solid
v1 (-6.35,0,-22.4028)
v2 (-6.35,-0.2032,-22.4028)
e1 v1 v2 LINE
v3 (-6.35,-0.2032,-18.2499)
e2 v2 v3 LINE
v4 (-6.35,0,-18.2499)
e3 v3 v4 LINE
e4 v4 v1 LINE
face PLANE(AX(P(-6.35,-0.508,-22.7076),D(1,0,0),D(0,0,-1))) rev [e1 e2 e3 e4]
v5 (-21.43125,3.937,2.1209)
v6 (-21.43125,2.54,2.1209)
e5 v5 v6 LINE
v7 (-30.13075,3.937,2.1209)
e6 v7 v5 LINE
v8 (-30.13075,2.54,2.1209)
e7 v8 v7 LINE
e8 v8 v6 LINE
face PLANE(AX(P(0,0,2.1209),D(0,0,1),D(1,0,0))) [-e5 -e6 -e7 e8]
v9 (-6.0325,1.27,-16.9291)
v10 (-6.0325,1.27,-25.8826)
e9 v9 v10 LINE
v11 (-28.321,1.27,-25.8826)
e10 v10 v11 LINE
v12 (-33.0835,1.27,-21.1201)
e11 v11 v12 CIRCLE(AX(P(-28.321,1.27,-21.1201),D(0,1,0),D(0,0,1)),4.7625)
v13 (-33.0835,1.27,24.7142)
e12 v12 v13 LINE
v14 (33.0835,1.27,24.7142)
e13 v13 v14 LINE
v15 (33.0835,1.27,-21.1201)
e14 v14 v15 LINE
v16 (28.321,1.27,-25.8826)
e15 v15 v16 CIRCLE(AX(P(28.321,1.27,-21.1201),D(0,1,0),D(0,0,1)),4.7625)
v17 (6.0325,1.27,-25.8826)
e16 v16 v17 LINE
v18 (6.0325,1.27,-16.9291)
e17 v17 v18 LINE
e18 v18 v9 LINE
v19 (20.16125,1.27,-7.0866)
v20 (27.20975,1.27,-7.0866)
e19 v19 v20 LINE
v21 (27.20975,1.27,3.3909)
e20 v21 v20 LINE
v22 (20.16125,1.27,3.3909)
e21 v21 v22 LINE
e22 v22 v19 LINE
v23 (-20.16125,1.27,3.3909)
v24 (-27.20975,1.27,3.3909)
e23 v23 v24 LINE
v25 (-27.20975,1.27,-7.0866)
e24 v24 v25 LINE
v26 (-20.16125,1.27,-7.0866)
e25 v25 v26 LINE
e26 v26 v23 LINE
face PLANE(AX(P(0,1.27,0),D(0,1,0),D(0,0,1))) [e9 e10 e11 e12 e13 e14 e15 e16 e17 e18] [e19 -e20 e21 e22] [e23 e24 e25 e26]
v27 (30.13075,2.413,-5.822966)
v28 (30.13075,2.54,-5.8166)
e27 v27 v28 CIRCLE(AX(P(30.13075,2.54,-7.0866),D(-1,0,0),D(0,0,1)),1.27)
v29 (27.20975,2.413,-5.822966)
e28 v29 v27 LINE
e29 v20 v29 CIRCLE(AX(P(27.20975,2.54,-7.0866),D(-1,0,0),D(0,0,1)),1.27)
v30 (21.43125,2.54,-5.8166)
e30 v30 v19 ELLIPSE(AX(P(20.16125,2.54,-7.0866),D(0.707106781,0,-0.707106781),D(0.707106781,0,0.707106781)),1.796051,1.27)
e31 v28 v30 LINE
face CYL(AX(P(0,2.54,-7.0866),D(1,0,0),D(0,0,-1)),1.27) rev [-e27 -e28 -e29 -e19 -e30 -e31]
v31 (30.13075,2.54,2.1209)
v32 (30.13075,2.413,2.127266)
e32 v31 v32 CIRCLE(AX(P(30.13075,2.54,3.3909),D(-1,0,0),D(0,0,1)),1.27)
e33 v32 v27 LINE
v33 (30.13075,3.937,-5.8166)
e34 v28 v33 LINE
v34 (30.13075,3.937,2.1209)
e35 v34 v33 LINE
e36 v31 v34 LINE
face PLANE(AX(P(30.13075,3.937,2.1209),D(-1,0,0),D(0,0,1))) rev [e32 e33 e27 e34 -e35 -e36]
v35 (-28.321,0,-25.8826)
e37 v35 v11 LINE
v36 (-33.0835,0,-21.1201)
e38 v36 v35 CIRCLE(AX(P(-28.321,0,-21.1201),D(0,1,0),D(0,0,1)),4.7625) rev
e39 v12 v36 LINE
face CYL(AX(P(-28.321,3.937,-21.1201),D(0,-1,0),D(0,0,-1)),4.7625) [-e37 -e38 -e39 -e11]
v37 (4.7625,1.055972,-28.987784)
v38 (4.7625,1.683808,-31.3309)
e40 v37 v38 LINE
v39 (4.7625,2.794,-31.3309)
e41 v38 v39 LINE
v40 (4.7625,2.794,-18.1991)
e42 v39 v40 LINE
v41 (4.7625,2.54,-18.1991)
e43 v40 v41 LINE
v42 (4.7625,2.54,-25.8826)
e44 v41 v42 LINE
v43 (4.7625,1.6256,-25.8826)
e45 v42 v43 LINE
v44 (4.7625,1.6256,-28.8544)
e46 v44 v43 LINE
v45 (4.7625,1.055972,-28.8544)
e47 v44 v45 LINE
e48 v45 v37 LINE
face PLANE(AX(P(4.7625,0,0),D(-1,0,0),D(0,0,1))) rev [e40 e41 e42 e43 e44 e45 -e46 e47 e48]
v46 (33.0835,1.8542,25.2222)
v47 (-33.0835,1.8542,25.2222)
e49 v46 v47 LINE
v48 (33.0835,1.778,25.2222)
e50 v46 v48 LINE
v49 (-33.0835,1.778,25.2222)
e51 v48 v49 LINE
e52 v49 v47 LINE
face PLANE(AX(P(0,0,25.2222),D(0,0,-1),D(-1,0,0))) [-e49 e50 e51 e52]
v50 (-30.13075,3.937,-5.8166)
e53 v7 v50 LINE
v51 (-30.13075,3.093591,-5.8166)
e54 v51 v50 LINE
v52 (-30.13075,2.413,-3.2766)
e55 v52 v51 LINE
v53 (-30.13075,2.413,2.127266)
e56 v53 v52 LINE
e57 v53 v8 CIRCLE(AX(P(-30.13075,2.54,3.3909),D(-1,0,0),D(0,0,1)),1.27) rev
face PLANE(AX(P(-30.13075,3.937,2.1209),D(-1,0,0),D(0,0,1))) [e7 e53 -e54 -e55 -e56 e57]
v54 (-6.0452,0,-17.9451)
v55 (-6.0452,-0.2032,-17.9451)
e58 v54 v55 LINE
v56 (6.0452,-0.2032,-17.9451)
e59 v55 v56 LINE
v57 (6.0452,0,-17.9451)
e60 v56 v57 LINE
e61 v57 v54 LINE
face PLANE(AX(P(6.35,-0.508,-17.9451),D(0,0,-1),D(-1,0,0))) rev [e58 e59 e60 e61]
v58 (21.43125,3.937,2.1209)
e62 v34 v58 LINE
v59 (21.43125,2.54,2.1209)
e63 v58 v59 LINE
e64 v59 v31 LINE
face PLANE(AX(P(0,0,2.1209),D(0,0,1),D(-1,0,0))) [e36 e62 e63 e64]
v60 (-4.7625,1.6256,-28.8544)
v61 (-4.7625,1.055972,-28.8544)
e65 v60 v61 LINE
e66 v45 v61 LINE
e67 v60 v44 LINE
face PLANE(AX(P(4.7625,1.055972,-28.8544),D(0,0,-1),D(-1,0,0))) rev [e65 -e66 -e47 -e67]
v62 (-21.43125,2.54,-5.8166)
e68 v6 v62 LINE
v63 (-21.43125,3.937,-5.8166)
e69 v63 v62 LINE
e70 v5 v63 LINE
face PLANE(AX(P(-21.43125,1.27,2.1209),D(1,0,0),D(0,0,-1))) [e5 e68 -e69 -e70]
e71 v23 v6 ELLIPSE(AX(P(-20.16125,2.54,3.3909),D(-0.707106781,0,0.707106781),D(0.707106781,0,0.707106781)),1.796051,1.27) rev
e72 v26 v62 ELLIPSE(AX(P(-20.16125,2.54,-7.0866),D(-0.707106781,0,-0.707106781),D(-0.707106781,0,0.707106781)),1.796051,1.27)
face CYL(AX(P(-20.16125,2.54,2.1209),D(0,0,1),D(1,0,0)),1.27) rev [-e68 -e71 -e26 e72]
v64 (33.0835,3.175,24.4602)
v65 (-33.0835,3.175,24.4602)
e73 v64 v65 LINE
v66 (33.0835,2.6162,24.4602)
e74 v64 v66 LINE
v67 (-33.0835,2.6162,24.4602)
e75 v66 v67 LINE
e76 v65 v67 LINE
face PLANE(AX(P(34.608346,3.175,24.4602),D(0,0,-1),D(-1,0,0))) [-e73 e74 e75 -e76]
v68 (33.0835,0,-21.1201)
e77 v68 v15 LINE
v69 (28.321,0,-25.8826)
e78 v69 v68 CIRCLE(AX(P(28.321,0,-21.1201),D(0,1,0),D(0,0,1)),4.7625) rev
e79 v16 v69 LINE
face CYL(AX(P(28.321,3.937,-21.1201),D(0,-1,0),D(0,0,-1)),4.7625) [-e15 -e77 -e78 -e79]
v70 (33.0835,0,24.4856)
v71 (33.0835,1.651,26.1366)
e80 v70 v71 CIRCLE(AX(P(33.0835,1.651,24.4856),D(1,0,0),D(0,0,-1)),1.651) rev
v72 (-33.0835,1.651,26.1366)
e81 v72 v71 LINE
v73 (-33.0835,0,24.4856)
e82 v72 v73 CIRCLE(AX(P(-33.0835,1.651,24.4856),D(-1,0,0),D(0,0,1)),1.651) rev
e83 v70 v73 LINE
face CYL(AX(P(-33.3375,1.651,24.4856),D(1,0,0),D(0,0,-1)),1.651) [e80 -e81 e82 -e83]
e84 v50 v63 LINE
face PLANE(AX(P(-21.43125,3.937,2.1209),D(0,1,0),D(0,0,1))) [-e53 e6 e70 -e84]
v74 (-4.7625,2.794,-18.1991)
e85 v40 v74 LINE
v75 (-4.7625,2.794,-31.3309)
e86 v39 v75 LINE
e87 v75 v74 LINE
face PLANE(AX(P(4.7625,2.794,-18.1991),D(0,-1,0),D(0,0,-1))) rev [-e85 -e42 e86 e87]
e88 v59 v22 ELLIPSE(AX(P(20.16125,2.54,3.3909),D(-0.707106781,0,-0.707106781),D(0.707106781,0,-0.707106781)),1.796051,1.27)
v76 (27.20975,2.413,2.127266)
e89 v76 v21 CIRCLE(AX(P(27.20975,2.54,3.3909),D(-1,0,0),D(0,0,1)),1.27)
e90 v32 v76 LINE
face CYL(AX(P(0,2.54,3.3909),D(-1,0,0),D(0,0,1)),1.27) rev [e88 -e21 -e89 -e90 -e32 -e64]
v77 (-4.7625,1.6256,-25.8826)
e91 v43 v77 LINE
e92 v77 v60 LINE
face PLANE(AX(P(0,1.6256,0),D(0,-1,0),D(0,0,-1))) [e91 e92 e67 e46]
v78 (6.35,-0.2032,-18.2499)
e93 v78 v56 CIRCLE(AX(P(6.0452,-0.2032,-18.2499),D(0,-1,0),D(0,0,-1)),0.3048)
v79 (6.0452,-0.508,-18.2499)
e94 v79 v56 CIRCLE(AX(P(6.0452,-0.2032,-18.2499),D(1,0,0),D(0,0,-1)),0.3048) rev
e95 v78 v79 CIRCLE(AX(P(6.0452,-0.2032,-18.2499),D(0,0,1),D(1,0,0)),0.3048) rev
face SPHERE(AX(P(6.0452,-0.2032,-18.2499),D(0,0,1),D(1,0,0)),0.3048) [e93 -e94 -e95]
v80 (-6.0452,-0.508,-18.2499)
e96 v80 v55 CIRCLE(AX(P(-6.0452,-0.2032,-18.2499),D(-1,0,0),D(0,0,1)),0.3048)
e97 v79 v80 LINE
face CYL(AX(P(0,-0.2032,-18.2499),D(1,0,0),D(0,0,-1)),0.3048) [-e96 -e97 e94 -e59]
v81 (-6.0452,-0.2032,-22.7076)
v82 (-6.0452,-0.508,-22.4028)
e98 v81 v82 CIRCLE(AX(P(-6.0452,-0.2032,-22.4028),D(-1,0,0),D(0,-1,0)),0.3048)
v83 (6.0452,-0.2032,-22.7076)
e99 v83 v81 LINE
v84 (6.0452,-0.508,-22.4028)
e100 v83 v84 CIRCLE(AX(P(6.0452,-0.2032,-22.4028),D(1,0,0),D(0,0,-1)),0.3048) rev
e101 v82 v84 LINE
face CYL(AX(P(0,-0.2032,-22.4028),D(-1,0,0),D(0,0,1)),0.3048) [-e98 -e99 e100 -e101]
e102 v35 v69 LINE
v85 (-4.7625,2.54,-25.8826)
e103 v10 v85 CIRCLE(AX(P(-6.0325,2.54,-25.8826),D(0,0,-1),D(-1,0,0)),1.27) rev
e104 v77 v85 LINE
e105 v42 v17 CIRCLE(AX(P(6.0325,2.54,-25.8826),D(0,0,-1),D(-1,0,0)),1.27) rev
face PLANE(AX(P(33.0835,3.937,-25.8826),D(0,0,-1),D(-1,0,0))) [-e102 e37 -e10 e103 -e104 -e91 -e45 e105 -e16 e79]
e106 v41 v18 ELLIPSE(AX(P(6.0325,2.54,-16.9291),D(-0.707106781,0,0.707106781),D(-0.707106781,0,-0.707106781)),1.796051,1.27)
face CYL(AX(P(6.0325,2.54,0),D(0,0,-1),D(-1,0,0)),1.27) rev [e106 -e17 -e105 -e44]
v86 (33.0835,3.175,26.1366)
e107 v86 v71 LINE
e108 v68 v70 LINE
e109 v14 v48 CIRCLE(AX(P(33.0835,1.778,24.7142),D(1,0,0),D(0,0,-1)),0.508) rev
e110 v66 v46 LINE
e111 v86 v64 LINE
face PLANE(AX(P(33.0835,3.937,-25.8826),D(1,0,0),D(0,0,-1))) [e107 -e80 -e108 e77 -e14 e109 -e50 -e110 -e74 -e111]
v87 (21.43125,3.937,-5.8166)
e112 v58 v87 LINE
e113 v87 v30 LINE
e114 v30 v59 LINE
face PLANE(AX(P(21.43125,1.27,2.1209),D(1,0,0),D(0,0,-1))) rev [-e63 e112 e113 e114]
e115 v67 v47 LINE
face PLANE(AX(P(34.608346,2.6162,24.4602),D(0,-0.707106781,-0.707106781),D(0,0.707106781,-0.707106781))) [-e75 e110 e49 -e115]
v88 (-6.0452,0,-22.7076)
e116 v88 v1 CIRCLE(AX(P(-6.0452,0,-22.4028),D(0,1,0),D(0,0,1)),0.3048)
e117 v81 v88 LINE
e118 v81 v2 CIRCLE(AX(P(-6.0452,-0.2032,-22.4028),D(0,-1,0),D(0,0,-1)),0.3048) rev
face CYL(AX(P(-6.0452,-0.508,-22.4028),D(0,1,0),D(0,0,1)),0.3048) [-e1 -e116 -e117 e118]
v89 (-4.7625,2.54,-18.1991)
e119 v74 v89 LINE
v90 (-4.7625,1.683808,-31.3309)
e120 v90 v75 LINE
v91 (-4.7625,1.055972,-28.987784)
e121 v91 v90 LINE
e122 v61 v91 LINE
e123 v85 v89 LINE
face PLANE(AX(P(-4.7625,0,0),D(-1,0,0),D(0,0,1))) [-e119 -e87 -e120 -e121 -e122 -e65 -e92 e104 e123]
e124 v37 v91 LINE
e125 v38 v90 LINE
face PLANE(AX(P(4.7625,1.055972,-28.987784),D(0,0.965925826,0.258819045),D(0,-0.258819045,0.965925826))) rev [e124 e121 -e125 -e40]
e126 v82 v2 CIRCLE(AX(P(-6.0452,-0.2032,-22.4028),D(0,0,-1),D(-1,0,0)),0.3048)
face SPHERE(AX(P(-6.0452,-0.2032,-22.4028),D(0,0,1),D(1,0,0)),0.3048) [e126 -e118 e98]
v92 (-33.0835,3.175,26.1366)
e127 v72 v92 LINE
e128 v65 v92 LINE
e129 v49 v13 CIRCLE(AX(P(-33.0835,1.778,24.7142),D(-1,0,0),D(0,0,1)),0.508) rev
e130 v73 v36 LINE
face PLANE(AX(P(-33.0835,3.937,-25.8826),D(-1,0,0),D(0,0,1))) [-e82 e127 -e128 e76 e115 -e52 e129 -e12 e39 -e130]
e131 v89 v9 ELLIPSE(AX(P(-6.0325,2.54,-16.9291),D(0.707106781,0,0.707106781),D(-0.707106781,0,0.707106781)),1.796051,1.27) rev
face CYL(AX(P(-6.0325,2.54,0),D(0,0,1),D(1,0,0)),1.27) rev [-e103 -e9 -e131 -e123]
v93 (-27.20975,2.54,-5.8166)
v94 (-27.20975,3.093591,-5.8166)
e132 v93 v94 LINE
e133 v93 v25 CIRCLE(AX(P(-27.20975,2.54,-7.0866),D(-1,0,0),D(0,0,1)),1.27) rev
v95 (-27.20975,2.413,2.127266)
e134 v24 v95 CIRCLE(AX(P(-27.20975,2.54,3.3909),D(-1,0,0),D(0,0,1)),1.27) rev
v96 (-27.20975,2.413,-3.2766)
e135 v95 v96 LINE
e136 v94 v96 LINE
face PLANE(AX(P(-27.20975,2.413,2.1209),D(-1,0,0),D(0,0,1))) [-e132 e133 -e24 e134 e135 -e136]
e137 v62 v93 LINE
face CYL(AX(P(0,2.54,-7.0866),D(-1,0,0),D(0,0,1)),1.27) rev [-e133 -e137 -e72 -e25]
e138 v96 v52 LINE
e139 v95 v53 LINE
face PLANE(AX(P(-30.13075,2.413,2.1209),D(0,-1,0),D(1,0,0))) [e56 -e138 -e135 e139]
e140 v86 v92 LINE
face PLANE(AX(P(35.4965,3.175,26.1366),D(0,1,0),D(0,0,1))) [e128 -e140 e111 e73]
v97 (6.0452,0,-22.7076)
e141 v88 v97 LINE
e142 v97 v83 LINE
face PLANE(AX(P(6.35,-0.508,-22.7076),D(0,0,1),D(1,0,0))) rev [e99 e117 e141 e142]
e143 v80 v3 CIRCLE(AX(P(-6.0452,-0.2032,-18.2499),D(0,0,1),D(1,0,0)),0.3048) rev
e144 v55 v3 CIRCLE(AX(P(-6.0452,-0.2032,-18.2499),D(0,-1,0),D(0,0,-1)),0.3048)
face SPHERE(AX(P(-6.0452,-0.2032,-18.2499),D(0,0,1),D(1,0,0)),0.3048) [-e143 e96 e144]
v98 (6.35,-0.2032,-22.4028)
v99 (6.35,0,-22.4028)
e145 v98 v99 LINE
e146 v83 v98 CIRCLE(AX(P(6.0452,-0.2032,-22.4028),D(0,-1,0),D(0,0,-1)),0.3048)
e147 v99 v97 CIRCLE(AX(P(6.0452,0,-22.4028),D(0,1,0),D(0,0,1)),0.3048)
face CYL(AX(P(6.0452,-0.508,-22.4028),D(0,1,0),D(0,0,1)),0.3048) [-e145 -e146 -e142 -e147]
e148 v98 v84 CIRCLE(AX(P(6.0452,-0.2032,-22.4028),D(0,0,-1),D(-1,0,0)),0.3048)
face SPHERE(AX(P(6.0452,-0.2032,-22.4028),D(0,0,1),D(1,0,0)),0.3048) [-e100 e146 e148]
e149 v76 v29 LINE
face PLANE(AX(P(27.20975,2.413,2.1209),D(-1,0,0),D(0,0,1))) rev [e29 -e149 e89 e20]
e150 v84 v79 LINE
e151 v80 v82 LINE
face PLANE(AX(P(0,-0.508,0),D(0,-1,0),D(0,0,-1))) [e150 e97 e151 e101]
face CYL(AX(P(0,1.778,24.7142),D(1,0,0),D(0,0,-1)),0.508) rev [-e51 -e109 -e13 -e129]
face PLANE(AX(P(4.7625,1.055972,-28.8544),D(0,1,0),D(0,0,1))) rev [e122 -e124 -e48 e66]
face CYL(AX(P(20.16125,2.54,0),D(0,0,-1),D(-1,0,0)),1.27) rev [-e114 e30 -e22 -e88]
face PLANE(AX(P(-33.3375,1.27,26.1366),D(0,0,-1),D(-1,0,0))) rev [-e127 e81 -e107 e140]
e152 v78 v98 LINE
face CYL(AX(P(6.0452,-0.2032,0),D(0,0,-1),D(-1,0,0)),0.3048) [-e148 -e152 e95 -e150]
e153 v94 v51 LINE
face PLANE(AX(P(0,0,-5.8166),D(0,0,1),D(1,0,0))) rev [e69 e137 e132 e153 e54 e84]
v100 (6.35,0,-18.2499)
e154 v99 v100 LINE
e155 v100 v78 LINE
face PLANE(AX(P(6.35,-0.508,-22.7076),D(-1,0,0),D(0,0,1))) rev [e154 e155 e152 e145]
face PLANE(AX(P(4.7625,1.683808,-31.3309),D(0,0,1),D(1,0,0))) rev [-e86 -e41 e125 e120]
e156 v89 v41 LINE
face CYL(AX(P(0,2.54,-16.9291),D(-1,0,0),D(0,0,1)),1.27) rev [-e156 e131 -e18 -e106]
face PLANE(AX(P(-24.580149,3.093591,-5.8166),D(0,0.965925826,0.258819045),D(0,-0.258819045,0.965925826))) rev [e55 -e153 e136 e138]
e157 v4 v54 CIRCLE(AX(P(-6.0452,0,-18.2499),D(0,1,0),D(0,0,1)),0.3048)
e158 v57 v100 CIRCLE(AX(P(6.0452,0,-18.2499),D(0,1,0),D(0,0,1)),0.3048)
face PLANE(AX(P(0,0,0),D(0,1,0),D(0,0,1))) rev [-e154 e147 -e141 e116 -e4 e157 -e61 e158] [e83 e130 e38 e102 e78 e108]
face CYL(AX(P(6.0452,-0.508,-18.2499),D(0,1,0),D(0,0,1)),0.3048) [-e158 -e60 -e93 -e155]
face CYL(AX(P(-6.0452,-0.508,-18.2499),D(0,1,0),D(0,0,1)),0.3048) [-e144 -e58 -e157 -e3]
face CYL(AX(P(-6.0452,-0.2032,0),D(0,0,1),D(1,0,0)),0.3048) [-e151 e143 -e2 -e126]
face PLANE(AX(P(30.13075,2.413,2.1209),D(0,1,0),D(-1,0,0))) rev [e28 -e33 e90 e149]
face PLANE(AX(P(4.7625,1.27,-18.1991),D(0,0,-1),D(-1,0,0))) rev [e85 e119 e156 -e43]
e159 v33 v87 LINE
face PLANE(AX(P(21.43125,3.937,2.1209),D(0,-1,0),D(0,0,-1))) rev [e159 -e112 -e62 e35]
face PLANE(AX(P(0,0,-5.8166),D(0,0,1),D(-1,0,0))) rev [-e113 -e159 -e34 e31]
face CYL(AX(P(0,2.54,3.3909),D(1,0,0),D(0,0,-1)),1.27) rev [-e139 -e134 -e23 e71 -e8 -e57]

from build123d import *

# Parameters (mm, degrees)
SKETCH1_W            = 66.675
SKETCH1_H            = 52.2732
BOSS_EXTRUDE1_DEPTH  = 1.27
BOSS_EXTRUDE3_DEPTH  = 4.7625
BOSS_EXTRUDE4_DEPTH  = 7.9375
CUT_EXTRUDE2_DEPTH   = 2.921
FILLET1_R            = 1.27
FILLET2_R            = 1.27
MIRROR1_START        = 20.16125
MIRROR1_DEPTH        = 7.0485
MIRROR1_START_2      = 27.20975
MIRROR1_2_DEPTH      = 2.921
MIRROR1_START_3      = -8
MIRROR1_3_DEPTH      = 12
SKETCH7_W            = 1.016
SKETCH7_H            = 1.905
BOSS_EXTRUDE5_DEPTH  = 66.675
SKETCH8_W            = 66.675
SKETCH8_H            = 0.6604
BOSS_EXTRUDE6_DEPTH  = 0.762
FILLET5_R            = 1.651
SKETCH10_W           = 9.525
SKETCH10_H           = 2.7178
CUT_EXTRUDE3_DEPTH   = 0.1016
SKETCH11_W           = 66.675
SKETCH11_H           = 1.2446
CUT_EXTRUDE4_DEPTH   = 0.1016
SKETCH12_W           = 107.616027614
SKETCH12_H           = 63.046095141
SKETCH12_W_2         = 66.167
SKETCH12_H_2         = 53.768388695
CUT_EXTRUDE5_DEPTH   = 46.918560191
FILLET6_R            = 4.7625
SKETCH13_W           = 0.8636
SKETCH13_H           = 0.6604
CUT_EXTRUDE6_DEPTH   = 74.315736052
BOSS_EXTRUDE8_DEPTH  = 66.167
FILLET7_R            = 0.508
BOSS_EXTRUDE9_DEPTH  = 66.167
SKETCH17_W           = 9.525
SKETCH17_H           = 1.1684
BOSS_EXTRUDE10_DEPTH = 1.27
SKETCH18_W           = 12.7
SKETCH18_H           = 4.7625
BOSS_EXTRUDE13_DEPTH = 0.508
FILLET8_R            = 0.3048


with BuildPart() as part:
    # Sketch1 → Boss-Extrude1 (new body)
    with BuildSketch(Plane(origin=(0, 0, 0), x_dir=(1, 0, 0), z_dir=(0, 1, 0))):
        Rectangle(SKETCH1_W, SKETCH1_H)
    extrude(amount=BOSS_EXTRUDE1_DEPTH)

    # Sketch4 → Boss-Extrude3 (add, symmetric)
    with BuildSketch(Plane(origin=(0, 0, 0), x_dir=(0, 0, -1), z_dir=(1, 0, 0))):
        Polygon((28.987783874, 1.055971868), (31.3309, 1.683807942), (31.3309, 2.794), (18.1991, 2.794), (18.1991, 1.27), (26.1366, 1.27), (26.1366, 1.524), (28.8544, 1.524), (28.8544, 1.055971868), align=None)
    extrude(amount=BOSS_EXTRUDE3_DEPTH, both=True)

    # Sketch5 → Boss-Extrude4 (add)
    with BuildSketch(Plane(origin=(0, 0, -5.8166), x_dir=(-1, 0, 0), z_dir=(0, 0, -1))):
        Polygon((21.43125, 1.27), (27.20975, 1.27), (27.20975, 2.413), (30.13075, 2.413), (30.13075, 3.937), (21.43125, 3.937), align=None)
    extrude(amount=-BOSS_EXTRUDE4_DEPTH)

    # Sketch6 → Cut-Extrude2 (cut)
    with BuildSketch(Plane.ZY.offset(30.13075)):
        Polygon((-5.8166, 2.413), (-3.2766, 2.413), (-5.8166, 3.093590949), align=None)
    extrude(amount=-CUT_EXTRUDE2_DEPTH, mode=Mode.SUBTRACT)

    # Fillet1
    fillet1_edges = [part.edges().sort_by_distance(p)[0] for p in [
        (-24.3205, 1.27, 2.1209),
        (-21.43125, 1.27, -1.84785),
        (-24.3205, 1.27, -5.8166),
    ]]
    fillet(fillet1_edges, radius=FILLET1_R)

    # Fillet2
    # the kernel refuses this fillet: 1.27 mm, written as the material it adds along each edge
    with BuildSketch(Plane(origin=(-4.7625, 1.27, -18.1991), x_dir=(-1, 0, 0), z_dir=(0, 0, -1))) as fillet2_piece_1:
        with BuildLine():
            CenterArc((FILLET2_R, FILLET2_R), FILLET2_R, 180, 90)
            Line((0, FILLET2_R), (-FILLET2_R * 0.02, FILLET2_R))
            Line((-FILLET2_R * 0.02, FILLET2_R), (-FILLET2_R * 0.02, -FILLET2_R * 0.02))
            Line((-FILLET2_R * 0.02, -FILLET2_R * 0.02), (FILLET2_R, -FILLET2_R * 0.02))
            Line((FILLET2_R, -FILLET2_R * 0.02), (FILLET2_R, 0))
        make_face()
    extrude(amount=7.9375)
    with BuildSketch(Plane(origin=(-4.7625, 1.27, -18.1991), x_dir=(0, 0, 1), z_dir=(1, 0, 0))) as fillet2_piece_2:
        with BuildLine():
            CenterArc((FILLET2_R, -FILLET2_R), FILLET2_R, 90, 90)
            Line((0, -FILLET2_R), (-FILLET2_R * 0.02, -FILLET2_R))
            Line((-FILLET2_R * 0.02, -FILLET2_R), (-FILLET2_R * 0.02, FILLET2_R * 0.02))
            Line((-FILLET2_R * 0.02, FILLET2_R * 0.02), (FILLET2_R, FILLET2_R * 0.02))
            Line((FILLET2_R, FILLET2_R * 0.02), (FILLET2_R, 0))
        make_face()
    extrude(amount=9.525)
    with BuildSketch(Plane(origin=(4.7625, 1.27, -18.1991), x_dir=(1, 0, 0), z_dir=(0, 0, -1))) as fillet2_piece_3:
        with BuildLine():
            CenterArc((FILLET2_R, -FILLET2_R), FILLET2_R, 90, 90)
            Line((0, -FILLET2_R), (-FILLET2_R * 0.02, -FILLET2_R))
            Line((-FILLET2_R * 0.02, -FILLET2_R), (-FILLET2_R * 0.02, FILLET2_R * 0.02))
            Line((-FILLET2_R * 0.02, FILLET2_R * 0.02), (FILLET2_R, FILLET2_R * 0.02))
            Line((FILLET2_R, FILLET2_R * 0.02), (FILLET2_R, 0))
        make_face()
    extrude(amount=7.9375)
    with BuildSketch(Plane(origin=(-4.7625, 1.27, -15.0241), x_dir=(-1, 0, 0), z_dir=(0, 0, -1))) as fillet2_piece_4a_section:
        with BuildLine():
            CenterArc((FILLET2_R, FILLET2_R), FILLET2_R, 180, 90)
            Line((0, FILLET2_R), (-FILLET2_R * 0.02, FILLET2_R))
            Line((-FILLET2_R * 0.02, FILLET2_R), (-FILLET2_R * 0.02, -FILLET2_R * 0.02))
            Line((-FILLET2_R * 0.02, -FILLET2_R * 0.02), (FILLET2_R, -FILLET2_R * 0.02))
            Line((FILLET2_R, -FILLET2_R * 0.02), (FILLET2_R, 0))
        make_face()
    fillet2_piece_4a = extrude(amount=11.1125, mode=Mode.PRIVATE)
    fillet2_piece_4a = split(fillet2_piece_4a, bisect_by=Plane(origin=(-4.7625, 1.27, -18.1991), z_dir=(0, 0, 1)), keep=Keep.TOP, mode=Mode.PRIVATE)
    with BuildSketch(Plane(origin=(-7.9375, 1.27, -18.1991), x_dir=(0, 0, 1), z_dir=(1, 0, 0))) as fillet2_piece_4b_section:
        with BuildLine():
            CenterArc((FILLET2_R, -FILLET2_R), FILLET2_R, 90, 90)
            Line((0, -FILLET2_R), (-FILLET2_R * 0.02, -FILLET2_R))
            Line((-FILLET2_R * 0.02, -FILLET2_R), (-FILLET2_R * 0.02, FILLET2_R * 0.02))
            Line((-FILLET2_R * 0.02, FILLET2_R * 0.02), (FILLET2_R, FILLET2_R * 0.02))
            Line((FILLET2_R, FILLET2_R * 0.02), (FILLET2_R, 0))
        make_face()
    fillet2_piece_4b = extrude(amount=12.7, mode=Mode.PRIVATE)
    fillet2_piece_4b = split(fillet2_piece_4b, bisect_by=Plane(origin=(-4.7625, 1.27, -18.1991), z_dir=(-1, 0, 0)), keep=Keep.TOP, mode=Mode.PRIVATE)
    fillet2_piece_4 = fillet2_piece_4a & fillet2_piece_4b
    add(fillet2_piece_4)
    with BuildSketch(Plane(origin=(-4.7625, 1.27, -18.1991), x_dir=(0, 0, 1), z_dir=(1, 0, 0))) as fillet2_piece_5a_section:
        with BuildLine():
            CenterArc((FILLET2_R, -FILLET2_R), FILLET2_R, 90, 90)
            Line((0, -FILLET2_R), (-FILLET2_R * 0.02, -FILLET2_R))
            Line((-FILLET2_R * 0.02, -FILLET2_R), (-FILLET2_R * 0.02, FILLET2_R * 0.02))
            Line((-FILLET2_R * 0.02, FILLET2_R * 0.02), (FILLET2_R, FILLET2_R * 0.02))
            Line((FILLET2_R, FILLET2_R * 0.02), (FILLET2_R, 0))
        make_face()
    fillet2_piece_5a = extrude(amount=12.7, mode=Mode.PRIVATE)
    fillet2_piece_5a = split(fillet2_piece_5a, bisect_by=Plane(origin=(4.7625, 1.27, -18.1991), z_dir=(1, 0, 0)), keep=Keep.TOP, mode=Mode.PRIVATE)
    with BuildSketch(Plane(origin=(4.7625, 1.27, -15.0241), x_dir=(1, 0, 0), z_dir=(0, 0, -1))) as fillet2_piece_5b_section:
        with BuildLine():
            CenterArc((FILLET2_R, -FILLET2_R), FILLET2_R, 90, 90)
            Line((0, -FILLET2_R), (-FILLET2_R * 0.02, -FILLET2_R))
            Line((-FILLET2_R * 0.02, -FILLET2_R), (-FILLET2_R * 0.02, FILLET2_R * 0.02))
            Line((-FILLET2_R * 0.02, FILLET2_R * 0.02), (FILLET2_R, FILLET2_R * 0.02))
            Line((FILLET2_R, FILLET2_R * 0.02), (FILLET2_R, 0))
        make_face()
    fillet2_piece_5b = extrude(amount=11.1125, mode=Mode.PRIVATE)
    fillet2_piece_5b = split(fillet2_piece_5b, bisect_by=Plane(origin=(4.7625, 1.27, -18.1991), z_dir=(0, 0, 1)), keep=Keep.TOP, mode=Mode.PRIVATE)
    fillet2_piece_5 = fillet2_piece_5a & fillet2_piece_5b
    add(fillet2_piece_5)

    # Mirror1: read off the stored shape, not the designer's step
    # Mirror1 outline → Mirror1 (add)
    with BuildSketch(Plane.YZ.offset(MIRROR1_START)):
        with BuildLine():
            Line((3.937, -5.8166), (3.937, 2.1209))
            Line((3.937, 2.1209), (2.54, 2.1209))
            ThreePointArc((2.54, 2.1209), (1.641974388, 2.492874388), (1.27, 3.3909))
            Line((1.27, 3.3909), (1.27, -7.0866))
            ThreePointArc((1.27, -7.0866), (1.641974388, -6.188574388), (2.54, -5.8166))
            Line((2.54, -5.8166), (3.937, -5.8166))
        make_face()
    extrude(amount=MIRROR1_DEPTH)

    # Mirror1 2 outline → Mirror1 2 (add)
    with BuildSketch(Plane.YZ.offset(MIRROR1_START_2)):
        with BuildLine():
            Line((3.937, -5.8166), (3.937, 2.1209))
            Line((3.937, 2.1209), (2.54, 2.1209))
            ThreePointArc((2.54, 2.1209), (2.476420276, 2.122492487), (2.413, 2.127265955))
            Line((2.413, 2.127265955), (2.413, -5.822965955))
            ThreePointArc((2.413, -5.822965955), (2.476420276, -5.818192487), (2.54, -5.8166))
            Line((2.54, -5.8166), (3.937, -5.8166))
        make_face()
    extrude(amount=MIRROR1_2_DEPTH)

    # Mirror1 3 outline → Mirror1 3 (cut)
    with BuildSketch(Plane.XY.offset(MIRROR1_START_3)):
        with BuildLine():
            ThreePointArc((20.16125, 1.27), (21.059275612, 1.641974388), (21.43125, 2.54))
            Line((21.43125, 2.54), (21.43125, 3.937))
            Line((21.43125, 3.937), (20.16125, 3.937))
            Line((20.16125, 3.937), (20.16125, 1.27))
        make_face()
    extrude(amount=MIRROR1_3_DEPTH, mode=Mode.SUBTRACT)

    # Sketch7 → Boss-Extrude5 (add)
    with BuildSketch(Plane.ZY.offset(33.3375)):
        with Locations((25.6286, 2.2225)):
            Rectangle(SKETCH7_W, SKETCH7_H)
    extrude(amount=-BOSS_EXTRUDE5_DEPTH)

    # Sketch8 → Boss-Extrude6 (add)
    with BuildSketch(Plane(origin=(0, 0, 25.1206), x_dir=(-1, 0, 0), z_dir=(0, 0, -1))):
        with Locations((0, 2.8448)):
            Rectangle(SKETCH8_W, SKETCH8_H)
    extrude(amount=BOSS_EXTRUDE6_DEPTH)

    # Fillet5
    fillet5_edges = [part.edges().sort_by_distance(p)[0] for p in [
        (0, 0, 26.1366),
    ]]
    fillet(fillet5_edges, radius=FILLET5_R)

    # Sketch10 → Cut-Extrude3 (cut)
    with BuildSketch(Plane.XZ.offset(-1.524)):
        with Locations((0, -27.4955)):
            Rectangle(SKETCH10_W, SKETCH10_H)
    extrude(amount=-CUT_EXTRUDE3_DEPTH, mode=Mode.SUBTRACT)

    # Sketch11 → Cut-Extrude4 (cut)
    with BuildSketch(Plane(origin=(0, 0, 25.1206), x_dir=(-1, 0, 0), z_dir=(0, 0, -1))):
        with Locations((0, 1.8923)):
            Rectangle(SKETCH11_W, SKETCH11_H)
    extrude(amount=-CUT_EXTRUDE4_DEPTH, mode=Mode.SUBTRACT)

    # Sketch12 → Cut-Extrude5 (cut, through all)
    with BuildSketch(Plane.XZ):
        with Locations((0, 4.37044757)):
            Rectangle(SKETCH12_W, SKETCH12_H)
        with Locations((0, 1.001594348)):
            Rectangle(SKETCH12_W_2, SKETCH12_H_2, mode=Mode.SUBTRACT)
    extrude(amount=-CUT_EXTRUDE5_DEPTH, mode=Mode.SUBTRACT)


with BuildPart() as cut_extrude5_piece_1:
    # of the separate pieces the step leaves, piece 1, a body of its own (cut_extrude5_pieces)
    add(part.part.solids().sort_by_distance((33.0835, 1.651, 26.1366))[0])

    # Fillet6
    fillet6_edges = [cut_extrude5_piece_1.edges().sort_by_distance(p)[0] for p in [
        (-33.0835, 0.635, -25.8826),
        (33.0835, 0.635, -25.8826),
    ]]
    fillet(fillet6_edges, radius=FILLET6_R)

    # Sketch13 → Cut-Extrude6 (cut, through all)
    with BuildSketch(Plane.ZY.offset(33.0835)):
        with Locations((24.7904, 2.8448)):
            Rectangle(SKETCH13_W, SKETCH13_H)
    extrude(amount=-CUT_EXTRUDE6_DEPTH, mode=Mode.SUBTRACT)

    # Sketch14 → Boss-Extrude8 (add)
    with BuildSketch(Plane.ZY.offset(33.0835)):
        Polygon((25.2222, 3.175), (24.5872, 3.175), (24.5872, 2.54), (25.2222, 1.905), align=None)
    extrude(amount=-BOSS_EXTRUDE8_DEPTH)

    # Fillet7
    fillet7_edges = [cut_extrude5_piece_1.edges().sort_by_distance(p)[0] for p in [
        (0, 1.27, 25.2222),
    ]]
    fillet(fillet7_edges, radius=FILLET7_R)

    # Sketch16 → Boss-Extrude9 (add)
    with BuildSketch(Plane.ZY.offset(33.0835)):
        Polygon((25.2222, 3.175), (24.4602, 3.175), (24.4602, 2.6162), (25.2222, 1.8542), align=None)
    extrude(amount=-BOSS_EXTRUDE9_DEPTH)



with BuildPart() as cut_extrude5_piece_2:
    # of the separate pieces the step leaves, piece 2, a body of its own (cut_extrude5_pieces)
    add(part.part.solids().sort_by_distance((4.7625, 1.6256, -27.1526))[0])


with BuildPart() as cut_extrude5_piece_1_1:
    add(cut_extrude5_piece_1.part)

    add(cut_extrude5_piece_2.part)  # Boss-Extrude10 merges Cut-Extrude5 piece 2
    # Sketch17 → Boss-Extrude10 (add)
    with BuildSketch(Plane.XY.offset(-27.1526)):
        with Locations((0, 2.2098)):
            Rectangle(SKETCH17_W, SKETCH17_H)
    extrude(amount=BOSS_EXTRUDE10_DEPTH)

    # Sketch18 → Boss-Extrude13 (add)
    with BuildSketch(Plane.XZ):
        with Locations((0, -20.32635)):
            Rectangle(SKETCH18_W, SKETCH18_H)
    extrude(amount=BOSS_EXTRUDE13_DEPTH)

    # Fillet8
    fillet8_edges = [cut_extrude5_piece_1_1.edges().sort_by_distance(p)[0] for p in [
        (6.35, -0.254, -22.7076),
        (6.35, -0.254, -17.9451),
        (-6.35, -0.254, -17.9451),
        (-6.35, -0.254, -22.7076),
        (6.35, -0.508, -20.32635),
        (0, -0.508, -17.9451),
        (-6.35, -0.508, -20.32635),
        (0, -0.508, -22.7076),
    ]]
    fillet(fillet8_edges, radius=FILLET8_R)


solid = cut_extrude5_piece_1_1.part
